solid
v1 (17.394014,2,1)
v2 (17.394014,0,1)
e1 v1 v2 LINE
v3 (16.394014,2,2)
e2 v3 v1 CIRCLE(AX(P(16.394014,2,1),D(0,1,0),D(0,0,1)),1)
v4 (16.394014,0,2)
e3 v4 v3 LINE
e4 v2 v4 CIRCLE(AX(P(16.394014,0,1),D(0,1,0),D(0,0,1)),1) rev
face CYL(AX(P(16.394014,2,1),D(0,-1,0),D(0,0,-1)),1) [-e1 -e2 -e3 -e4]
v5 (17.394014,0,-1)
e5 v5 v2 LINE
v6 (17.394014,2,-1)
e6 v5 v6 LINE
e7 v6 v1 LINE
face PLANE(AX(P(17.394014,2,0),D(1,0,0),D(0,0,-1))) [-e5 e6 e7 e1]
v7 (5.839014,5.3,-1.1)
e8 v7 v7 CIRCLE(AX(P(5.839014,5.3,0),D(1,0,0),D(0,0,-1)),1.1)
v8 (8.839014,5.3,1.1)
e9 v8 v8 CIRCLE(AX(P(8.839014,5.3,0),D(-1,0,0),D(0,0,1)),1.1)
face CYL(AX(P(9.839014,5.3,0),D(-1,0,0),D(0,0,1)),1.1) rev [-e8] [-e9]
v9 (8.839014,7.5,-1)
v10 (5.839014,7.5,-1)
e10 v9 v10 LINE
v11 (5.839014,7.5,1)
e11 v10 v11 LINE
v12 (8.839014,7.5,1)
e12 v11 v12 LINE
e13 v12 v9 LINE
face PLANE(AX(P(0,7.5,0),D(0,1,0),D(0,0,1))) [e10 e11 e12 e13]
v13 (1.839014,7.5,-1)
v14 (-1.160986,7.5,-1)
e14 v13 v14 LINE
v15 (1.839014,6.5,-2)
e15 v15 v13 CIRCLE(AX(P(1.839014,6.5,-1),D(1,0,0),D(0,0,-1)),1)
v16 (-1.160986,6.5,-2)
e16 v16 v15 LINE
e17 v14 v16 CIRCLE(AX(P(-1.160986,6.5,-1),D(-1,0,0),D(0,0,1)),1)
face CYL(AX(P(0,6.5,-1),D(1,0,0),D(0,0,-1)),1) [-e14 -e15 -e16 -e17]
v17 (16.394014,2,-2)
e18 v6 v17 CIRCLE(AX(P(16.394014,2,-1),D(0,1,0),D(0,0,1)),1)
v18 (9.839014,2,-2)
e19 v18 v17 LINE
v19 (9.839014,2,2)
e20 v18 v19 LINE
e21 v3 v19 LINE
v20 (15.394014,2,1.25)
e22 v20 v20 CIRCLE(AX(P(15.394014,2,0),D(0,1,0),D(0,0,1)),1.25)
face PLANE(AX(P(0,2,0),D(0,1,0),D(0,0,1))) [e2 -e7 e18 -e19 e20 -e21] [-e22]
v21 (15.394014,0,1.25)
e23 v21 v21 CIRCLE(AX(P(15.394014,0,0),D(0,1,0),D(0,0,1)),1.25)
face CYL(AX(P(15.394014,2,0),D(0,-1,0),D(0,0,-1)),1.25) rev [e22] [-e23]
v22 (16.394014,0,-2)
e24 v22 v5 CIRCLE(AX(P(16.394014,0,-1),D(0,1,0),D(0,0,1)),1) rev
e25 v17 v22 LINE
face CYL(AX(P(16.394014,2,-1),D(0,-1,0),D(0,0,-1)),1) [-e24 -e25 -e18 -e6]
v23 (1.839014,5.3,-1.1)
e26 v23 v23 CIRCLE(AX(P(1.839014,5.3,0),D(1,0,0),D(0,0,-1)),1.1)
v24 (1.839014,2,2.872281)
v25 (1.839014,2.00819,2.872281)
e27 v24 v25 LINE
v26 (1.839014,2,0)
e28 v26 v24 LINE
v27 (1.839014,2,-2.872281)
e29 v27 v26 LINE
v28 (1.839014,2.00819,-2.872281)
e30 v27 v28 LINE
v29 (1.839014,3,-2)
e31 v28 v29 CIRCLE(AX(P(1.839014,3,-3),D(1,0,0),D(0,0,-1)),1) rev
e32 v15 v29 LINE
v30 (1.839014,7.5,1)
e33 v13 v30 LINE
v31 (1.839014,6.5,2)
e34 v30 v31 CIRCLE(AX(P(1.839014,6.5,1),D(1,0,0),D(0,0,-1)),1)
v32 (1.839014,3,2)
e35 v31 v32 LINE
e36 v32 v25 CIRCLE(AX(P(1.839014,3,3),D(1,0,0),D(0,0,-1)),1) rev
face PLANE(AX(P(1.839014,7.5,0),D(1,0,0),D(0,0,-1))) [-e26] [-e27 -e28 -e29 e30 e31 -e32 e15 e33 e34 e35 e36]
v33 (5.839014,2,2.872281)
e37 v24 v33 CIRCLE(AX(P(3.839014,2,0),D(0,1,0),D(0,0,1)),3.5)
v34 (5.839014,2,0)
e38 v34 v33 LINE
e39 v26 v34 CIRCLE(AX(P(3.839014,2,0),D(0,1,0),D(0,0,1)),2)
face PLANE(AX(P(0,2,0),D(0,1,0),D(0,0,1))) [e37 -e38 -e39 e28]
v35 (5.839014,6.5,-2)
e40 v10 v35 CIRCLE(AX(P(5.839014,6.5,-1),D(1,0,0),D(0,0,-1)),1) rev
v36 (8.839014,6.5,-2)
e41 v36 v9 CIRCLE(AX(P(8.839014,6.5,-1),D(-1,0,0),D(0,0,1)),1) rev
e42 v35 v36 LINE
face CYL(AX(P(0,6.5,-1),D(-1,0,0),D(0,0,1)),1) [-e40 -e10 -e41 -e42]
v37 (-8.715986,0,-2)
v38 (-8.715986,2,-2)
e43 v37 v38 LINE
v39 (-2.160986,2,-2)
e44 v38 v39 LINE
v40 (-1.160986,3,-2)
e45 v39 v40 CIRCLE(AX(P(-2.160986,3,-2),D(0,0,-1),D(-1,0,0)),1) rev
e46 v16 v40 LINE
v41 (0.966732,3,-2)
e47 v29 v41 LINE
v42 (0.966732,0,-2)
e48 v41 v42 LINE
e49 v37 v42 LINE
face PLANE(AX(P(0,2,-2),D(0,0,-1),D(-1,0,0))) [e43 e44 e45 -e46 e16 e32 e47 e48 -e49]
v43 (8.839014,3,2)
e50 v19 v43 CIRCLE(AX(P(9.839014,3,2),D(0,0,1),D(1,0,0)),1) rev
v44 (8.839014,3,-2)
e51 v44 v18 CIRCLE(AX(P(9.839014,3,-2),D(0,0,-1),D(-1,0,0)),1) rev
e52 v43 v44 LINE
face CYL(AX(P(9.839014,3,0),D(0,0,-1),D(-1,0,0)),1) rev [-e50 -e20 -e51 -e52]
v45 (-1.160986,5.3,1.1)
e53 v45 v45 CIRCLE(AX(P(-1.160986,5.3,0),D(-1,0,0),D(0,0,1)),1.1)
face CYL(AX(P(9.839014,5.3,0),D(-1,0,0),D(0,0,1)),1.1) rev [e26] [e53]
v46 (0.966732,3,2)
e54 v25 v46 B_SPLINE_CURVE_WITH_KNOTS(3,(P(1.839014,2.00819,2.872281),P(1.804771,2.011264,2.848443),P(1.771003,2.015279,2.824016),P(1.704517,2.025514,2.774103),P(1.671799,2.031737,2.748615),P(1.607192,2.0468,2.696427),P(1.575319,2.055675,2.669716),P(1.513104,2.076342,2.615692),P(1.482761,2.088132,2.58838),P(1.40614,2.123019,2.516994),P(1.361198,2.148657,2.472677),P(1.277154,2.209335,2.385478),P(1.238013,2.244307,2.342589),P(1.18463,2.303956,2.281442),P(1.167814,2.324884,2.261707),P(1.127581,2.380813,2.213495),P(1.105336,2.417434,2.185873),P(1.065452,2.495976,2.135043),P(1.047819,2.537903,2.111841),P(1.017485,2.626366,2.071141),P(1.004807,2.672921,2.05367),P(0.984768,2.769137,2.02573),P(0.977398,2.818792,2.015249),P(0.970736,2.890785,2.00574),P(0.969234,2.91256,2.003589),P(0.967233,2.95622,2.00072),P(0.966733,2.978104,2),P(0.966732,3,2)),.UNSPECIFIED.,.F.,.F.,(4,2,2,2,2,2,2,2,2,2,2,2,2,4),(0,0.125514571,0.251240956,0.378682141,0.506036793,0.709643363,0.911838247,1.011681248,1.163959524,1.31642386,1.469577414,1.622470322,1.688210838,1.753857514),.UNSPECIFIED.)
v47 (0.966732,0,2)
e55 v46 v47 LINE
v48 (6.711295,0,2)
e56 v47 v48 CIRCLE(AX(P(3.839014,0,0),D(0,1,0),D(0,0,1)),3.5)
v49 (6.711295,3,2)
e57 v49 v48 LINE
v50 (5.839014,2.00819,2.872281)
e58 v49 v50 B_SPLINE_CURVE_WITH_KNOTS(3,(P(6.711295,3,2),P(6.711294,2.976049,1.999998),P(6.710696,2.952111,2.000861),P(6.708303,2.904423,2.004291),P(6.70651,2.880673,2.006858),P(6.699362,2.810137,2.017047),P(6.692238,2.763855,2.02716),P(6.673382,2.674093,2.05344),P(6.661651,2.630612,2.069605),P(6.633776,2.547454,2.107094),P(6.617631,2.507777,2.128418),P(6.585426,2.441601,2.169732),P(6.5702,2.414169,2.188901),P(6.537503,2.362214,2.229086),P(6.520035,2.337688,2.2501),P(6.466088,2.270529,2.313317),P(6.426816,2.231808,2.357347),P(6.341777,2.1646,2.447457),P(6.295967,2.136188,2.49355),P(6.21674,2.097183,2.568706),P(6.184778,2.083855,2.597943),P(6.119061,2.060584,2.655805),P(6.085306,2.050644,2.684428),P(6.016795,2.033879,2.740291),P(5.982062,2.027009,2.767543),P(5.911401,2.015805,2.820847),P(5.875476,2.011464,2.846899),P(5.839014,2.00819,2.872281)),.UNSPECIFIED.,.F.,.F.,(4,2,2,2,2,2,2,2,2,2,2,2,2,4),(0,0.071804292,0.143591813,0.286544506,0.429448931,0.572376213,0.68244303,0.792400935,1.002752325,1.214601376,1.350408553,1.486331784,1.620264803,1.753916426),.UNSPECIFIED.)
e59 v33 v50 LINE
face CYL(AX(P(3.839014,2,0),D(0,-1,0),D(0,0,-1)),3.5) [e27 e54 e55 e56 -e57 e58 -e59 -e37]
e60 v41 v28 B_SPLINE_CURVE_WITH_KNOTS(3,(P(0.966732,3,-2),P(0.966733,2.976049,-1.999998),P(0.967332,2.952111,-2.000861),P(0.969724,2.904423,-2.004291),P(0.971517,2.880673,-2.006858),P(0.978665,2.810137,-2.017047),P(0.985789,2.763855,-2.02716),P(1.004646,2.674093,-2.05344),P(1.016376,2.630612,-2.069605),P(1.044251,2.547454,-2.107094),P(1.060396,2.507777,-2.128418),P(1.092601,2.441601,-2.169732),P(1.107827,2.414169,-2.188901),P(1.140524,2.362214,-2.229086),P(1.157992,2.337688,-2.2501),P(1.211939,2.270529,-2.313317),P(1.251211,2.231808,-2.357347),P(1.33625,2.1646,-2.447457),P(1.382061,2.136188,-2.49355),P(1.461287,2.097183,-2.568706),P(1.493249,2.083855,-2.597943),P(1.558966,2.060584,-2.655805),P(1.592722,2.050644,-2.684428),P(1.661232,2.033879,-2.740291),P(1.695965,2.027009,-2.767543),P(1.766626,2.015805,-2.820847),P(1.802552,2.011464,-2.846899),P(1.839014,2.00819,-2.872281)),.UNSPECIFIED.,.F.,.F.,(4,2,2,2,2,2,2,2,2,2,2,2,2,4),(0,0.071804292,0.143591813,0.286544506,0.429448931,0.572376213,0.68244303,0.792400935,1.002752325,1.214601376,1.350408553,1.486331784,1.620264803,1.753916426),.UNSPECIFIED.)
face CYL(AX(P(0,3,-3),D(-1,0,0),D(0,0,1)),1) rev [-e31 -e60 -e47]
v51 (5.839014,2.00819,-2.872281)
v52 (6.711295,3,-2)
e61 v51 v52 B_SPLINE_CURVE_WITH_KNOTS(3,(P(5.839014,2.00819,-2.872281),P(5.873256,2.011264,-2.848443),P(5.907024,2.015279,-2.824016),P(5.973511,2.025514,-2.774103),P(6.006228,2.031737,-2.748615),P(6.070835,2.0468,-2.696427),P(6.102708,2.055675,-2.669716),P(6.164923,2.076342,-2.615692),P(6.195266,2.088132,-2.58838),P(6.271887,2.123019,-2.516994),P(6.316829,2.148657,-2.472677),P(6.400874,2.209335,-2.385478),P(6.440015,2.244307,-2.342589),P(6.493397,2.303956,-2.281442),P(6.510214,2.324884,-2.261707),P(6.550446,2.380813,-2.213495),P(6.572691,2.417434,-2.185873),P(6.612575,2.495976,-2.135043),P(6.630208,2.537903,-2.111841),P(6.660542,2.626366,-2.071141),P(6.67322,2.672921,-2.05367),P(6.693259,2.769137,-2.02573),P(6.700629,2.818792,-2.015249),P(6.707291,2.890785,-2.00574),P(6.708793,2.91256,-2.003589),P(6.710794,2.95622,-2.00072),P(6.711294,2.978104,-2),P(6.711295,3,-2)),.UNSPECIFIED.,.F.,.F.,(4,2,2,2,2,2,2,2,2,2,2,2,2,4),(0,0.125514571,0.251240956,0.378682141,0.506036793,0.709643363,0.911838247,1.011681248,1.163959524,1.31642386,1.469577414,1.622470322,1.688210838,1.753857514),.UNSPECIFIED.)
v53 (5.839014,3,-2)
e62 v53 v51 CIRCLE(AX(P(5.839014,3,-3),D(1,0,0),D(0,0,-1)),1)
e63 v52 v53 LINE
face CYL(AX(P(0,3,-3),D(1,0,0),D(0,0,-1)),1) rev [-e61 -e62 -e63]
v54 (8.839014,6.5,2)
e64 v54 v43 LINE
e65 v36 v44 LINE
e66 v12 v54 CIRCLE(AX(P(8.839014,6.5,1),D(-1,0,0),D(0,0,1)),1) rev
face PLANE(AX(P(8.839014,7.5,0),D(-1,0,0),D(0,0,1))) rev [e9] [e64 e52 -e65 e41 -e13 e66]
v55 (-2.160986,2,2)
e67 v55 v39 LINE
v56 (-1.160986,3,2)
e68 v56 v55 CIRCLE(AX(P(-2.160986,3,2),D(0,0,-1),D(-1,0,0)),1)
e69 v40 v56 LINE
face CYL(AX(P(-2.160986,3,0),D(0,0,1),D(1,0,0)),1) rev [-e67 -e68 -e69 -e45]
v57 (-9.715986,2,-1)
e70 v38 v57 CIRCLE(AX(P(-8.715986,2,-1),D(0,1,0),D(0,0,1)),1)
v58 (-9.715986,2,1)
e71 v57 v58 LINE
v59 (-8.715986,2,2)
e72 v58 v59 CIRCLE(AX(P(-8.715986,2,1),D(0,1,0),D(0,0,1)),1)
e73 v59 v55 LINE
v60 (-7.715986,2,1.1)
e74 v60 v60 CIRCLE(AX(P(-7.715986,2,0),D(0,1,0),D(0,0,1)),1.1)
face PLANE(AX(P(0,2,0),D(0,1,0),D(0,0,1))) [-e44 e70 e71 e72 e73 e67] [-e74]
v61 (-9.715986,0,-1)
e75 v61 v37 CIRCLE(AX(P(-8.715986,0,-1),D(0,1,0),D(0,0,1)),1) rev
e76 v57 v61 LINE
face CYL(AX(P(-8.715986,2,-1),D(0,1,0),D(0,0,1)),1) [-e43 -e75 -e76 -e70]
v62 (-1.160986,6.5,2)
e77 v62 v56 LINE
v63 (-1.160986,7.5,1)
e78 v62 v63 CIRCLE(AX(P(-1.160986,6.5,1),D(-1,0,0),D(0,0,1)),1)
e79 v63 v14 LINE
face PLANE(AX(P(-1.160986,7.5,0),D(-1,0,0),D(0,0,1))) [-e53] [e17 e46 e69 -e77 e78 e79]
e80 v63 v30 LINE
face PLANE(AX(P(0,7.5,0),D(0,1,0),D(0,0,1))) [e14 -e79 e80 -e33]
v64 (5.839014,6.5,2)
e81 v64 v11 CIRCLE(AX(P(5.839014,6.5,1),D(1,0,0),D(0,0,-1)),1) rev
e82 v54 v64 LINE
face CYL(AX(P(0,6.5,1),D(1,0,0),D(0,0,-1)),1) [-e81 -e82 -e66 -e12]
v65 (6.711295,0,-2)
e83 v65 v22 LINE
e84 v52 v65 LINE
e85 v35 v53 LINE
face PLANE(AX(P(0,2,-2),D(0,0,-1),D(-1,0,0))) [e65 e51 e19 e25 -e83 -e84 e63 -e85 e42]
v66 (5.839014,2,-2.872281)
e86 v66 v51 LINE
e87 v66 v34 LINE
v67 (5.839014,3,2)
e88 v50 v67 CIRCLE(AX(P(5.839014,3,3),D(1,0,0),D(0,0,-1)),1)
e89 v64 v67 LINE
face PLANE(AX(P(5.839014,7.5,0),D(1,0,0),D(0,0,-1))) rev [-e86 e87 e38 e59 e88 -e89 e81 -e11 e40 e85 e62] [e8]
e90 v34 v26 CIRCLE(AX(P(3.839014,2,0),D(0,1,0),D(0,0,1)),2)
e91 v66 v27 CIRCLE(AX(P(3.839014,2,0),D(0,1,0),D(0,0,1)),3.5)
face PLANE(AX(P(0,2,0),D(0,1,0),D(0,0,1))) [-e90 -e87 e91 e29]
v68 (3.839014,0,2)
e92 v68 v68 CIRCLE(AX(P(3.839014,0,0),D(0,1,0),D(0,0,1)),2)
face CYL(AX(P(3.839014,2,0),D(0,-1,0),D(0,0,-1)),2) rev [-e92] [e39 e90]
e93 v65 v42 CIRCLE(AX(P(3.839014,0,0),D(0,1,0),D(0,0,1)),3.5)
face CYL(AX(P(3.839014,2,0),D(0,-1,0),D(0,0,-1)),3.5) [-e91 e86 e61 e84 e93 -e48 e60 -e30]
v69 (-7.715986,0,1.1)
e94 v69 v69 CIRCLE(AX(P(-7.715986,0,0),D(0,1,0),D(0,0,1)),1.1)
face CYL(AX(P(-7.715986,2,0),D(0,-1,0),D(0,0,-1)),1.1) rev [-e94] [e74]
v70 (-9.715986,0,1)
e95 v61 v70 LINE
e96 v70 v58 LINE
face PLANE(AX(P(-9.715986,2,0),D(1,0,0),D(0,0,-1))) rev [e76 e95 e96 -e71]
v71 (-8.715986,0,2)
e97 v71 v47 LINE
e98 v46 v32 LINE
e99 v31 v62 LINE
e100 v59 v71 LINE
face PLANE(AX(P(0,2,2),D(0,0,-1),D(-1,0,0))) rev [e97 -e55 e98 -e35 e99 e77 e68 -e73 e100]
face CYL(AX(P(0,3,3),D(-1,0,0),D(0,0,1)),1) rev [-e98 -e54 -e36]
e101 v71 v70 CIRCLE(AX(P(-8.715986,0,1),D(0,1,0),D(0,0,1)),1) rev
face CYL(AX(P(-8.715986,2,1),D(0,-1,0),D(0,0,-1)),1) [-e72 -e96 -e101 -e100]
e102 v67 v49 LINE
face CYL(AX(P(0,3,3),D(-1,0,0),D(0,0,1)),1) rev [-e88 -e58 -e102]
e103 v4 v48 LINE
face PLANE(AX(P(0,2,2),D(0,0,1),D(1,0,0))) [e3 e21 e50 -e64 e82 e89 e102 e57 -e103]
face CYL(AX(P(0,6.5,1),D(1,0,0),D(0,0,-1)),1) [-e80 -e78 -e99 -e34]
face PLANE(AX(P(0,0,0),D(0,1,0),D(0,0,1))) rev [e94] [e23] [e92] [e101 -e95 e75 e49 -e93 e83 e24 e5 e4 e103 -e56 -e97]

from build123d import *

# Parameters (mm, degrees)
SKETCH_1_R          = 2
SKETCH_1_R_2        = 1.25
SKETCH_1_R_3        = 1.1
EXTRUDE_1_DEPTH     = 2
SKETCH_2_W          = 3
SKETCH_2_H          = 4
EXTRUDE_2_DEPTH     = 5.5
SKETCH_4_R          = 1.1
CUT_EXTRUDE_1_DEPTH = 11
FILLET_2_R          = 1
FILLET_3_R          = 1
FILLET_4_R          = 1
FILLET_5_R          = 1


with BuildPart() as part:
    # 草图1 → 凸台-拉伸1 (new body)
    with BuildSketch(Plane(origin=(0, 0, 0), x_dir=(1, 0, 0), z_dir=(0, 1, 0))):
        with BuildLine():
            Line((6.711295009, -2), (17.394013685, -2))
            Line((17.394013685, -2), (17.394013685, 2))
            Line((17.394013685, 2), (6.711295009, 2))
            ThreePointArc((6.711295009, 2), (3.839013685, 3.5), (0.966732362, 2))
            Line((0.966732362, 2), (-9.715986315, 2))
            Line((-9.715986315, 2), (-9.715986315, -2))
            Line((-9.715986315, -2), (0.966732362, -2))
            ThreePointArc((0.966732362, -2), (3.839013685, -3.5), (6.711295009, -2))
        make_face()
        with Locations(Location((3.839013685, 0, 0), (0, 0, 270))):
            Circle(SKETCH_1_R, mode=Mode.SUBTRACT)
        with Locations(Location((15.394013685, 0, 0), (0, 0, 270))):
            Circle(SKETCH_1_R_2, mode=Mode.SUBTRACT)
        with Locations(Location((-7.715986315, 0, 0), (0, 0, 270))):
            Circle(SKETCH_1_R_3, mode=Mode.SUBTRACT)
    extrude(amount=EXTRUDE_1_DEPTH)

    # 草图2 → 凸台-拉伸2 (add)
    with BuildSketch(Plane(origin=(0, 2, 0), x_dir=(1, 0, 0), z_dir=(0, 1, 0))):
        with Locations((7.339013685, 0)):
            Rectangle(SKETCH_2_W, SKETCH_2_H)
        with Locations((0.339013685, 0)):
            Rectangle(SKETCH_2_W, SKETCH_2_H)
    extrude(amount=EXTRUDE_2_DEPTH)

    # 草图4 → 切除-拉伸1 (cut)
    with BuildSketch(Plane.ZY.offset(1.160986315)):
        with Locations((0, 5.3)):
            Circle(SKETCH_4_R)
    extrude(amount=-CUT_EXTRUDE_1_DEPTH, mode=Mode.SUBTRACT)

    # 圆角2
    fillet_2_edges = [part.edges().sort_by_distance(p)[0] for p in [
        (0.339013685, 7.5, -2),
        (0.339013685, 7.5, 2),
        (7.339013685, 7.5, -2),
        (7.339013685, 7.5, 2),
    ]]
    fillet(fillet_2_edges, radius=FILLET_2_R)

    # 圆角3
    fillet_3_edges = [part.edges().sort_by_distance(p)[0] for p in [
        (-1.160986315, 2, 0),
        (8.839013685, 2, 0),
    ]]
    fillet(fillet_3_edges, radius=FILLET_3_R)

    # 圆角4
    fillet_4_edges = [part.edges().sort_by_distance(p)[0] for p in [
        (-9.715986315, 1, 2),
        (-9.715986315, 1, -2),
        (17.394013685, 1, -2),
        (17.394013685, 1, 2),
    ]]
    fillet(fillet_4_edges, radius=FILLET_4_R)

    # 圆角5
    # the kernel refuses this fillet: 1 mm, written as the material it adds along each edge
    with BuildSketch(Plane(origin=(9.211295009, 2, -2), x_dir=(0, 1, 0), z_dir=(-1, 0, 0))) as fillet_5_piece_1_section:
        with BuildLine():
            CenterArc((FILLET_5_R, FILLET_5_R), FILLET_5_R, 180, 90)
            Line((0, FILLET_5_R), (0, 0))
            Line((0, 0), (FILLET_5_R, 0))
        make_face()
    fillet_5_piece_1 = extrude(amount=3.372281323, mode=Mode.PRIVATE)
    fillet_5_piece_1 = fillet_5_piece_1 & Plane(origin=(3.839013685, 2.261416354, 0), x_dir=(0.820651806648311, 0, -0.571428571428541), z_dir=(0, -1, 0)) * Cylinder(3.5, 11, mode=Mode.PRIVATE)
    add(fillet_5_piece_1)
    with BuildSketch(Plane(origin=(1.839013685, 2, -2), x_dir=(0, 1, 0), z_dir=(-1, 0, 0))) as fillet_5_piece_2_section:
        with BuildLine():
            CenterArc((FILLET_5_R, FILLET_5_R), FILLET_5_R, 180, 90)
            Line((0, FILLET_5_R), (0, 0))
            Line((0, 0), (FILLET_5_R, 0))
        make_face()
    fillet_5_piece_2 = extrude(amount=3.372281323, mode=Mode.PRIVATE)
    fillet_5_piece_2 = fillet_5_piece_2 & Plane(origin=(3.839013685, 2.261416398, 0), x_dir=(0.820651806648311, 0, -0.571428571428541), z_dir=(0, -1, 0)) * Cylinder(3.5, 11, mode=Mode.PRIVATE)
    add(fillet_5_piece_2)
    with BuildSketch(Plane(origin=(-1.533267638, 2, 2), x_dir=(0, 0, 1), z_dir=(1, 0, 0))) as fillet_5_piece_3_section:
        with BuildLine():
            CenterArc((FILLET_5_R, -FILLET_5_R), FILLET_5_R, 90, 90)
            Line((0, -FILLET_5_R), (0, 0))
            Line((0, 0), (FILLET_5_R, 0))
        make_face()
    fillet_5_piece_3 = extrude(amount=3.372281323, mode=Mode.PRIVATE)
    fillet_5_piece_3 = fillet_5_piece_3 & Plane(origin=(3.839013685, 2.26141635, 0), x_dir=(-0.8206518066482962, 0, 0.5714285714285624), z_dir=(0, -1, 0)) * Cylinder(3.5, 11, mode=Mode.PRIVATE)
    add(fillet_5_piece_3)
    with BuildSketch(Plane(origin=(5.839013685, 2, 2), x_dir=(0, 1, 0), z_dir=(1, 0, 0))) as fillet_5_piece_4_section:
        with BuildLine():
            CenterArc((FILLET_5_R, FILLET_5_R), FILLET_5_R, 180, 90)
            Line((0, FILLET_5_R), (0, 0))
            Line((0, 0), (FILLET_5_R, 0))
        make_face()
    fillet_5_piece_4 = extrude(amount=3.372281323, mode=Mode.PRIVATE)
    fillet_5_piece_4 = fillet_5_piece_4 & Plane(origin=(3.839013685, 2.261416398, 0), x_dir=(-0.8206518066482962, 0, 0.5714285714285624), z_dir=(0, -1, 0)) * Cylinder(3.5, 11, mode=Mode.PRIVATE)
    add(fillet_5_piece_4)


solid = part.part
